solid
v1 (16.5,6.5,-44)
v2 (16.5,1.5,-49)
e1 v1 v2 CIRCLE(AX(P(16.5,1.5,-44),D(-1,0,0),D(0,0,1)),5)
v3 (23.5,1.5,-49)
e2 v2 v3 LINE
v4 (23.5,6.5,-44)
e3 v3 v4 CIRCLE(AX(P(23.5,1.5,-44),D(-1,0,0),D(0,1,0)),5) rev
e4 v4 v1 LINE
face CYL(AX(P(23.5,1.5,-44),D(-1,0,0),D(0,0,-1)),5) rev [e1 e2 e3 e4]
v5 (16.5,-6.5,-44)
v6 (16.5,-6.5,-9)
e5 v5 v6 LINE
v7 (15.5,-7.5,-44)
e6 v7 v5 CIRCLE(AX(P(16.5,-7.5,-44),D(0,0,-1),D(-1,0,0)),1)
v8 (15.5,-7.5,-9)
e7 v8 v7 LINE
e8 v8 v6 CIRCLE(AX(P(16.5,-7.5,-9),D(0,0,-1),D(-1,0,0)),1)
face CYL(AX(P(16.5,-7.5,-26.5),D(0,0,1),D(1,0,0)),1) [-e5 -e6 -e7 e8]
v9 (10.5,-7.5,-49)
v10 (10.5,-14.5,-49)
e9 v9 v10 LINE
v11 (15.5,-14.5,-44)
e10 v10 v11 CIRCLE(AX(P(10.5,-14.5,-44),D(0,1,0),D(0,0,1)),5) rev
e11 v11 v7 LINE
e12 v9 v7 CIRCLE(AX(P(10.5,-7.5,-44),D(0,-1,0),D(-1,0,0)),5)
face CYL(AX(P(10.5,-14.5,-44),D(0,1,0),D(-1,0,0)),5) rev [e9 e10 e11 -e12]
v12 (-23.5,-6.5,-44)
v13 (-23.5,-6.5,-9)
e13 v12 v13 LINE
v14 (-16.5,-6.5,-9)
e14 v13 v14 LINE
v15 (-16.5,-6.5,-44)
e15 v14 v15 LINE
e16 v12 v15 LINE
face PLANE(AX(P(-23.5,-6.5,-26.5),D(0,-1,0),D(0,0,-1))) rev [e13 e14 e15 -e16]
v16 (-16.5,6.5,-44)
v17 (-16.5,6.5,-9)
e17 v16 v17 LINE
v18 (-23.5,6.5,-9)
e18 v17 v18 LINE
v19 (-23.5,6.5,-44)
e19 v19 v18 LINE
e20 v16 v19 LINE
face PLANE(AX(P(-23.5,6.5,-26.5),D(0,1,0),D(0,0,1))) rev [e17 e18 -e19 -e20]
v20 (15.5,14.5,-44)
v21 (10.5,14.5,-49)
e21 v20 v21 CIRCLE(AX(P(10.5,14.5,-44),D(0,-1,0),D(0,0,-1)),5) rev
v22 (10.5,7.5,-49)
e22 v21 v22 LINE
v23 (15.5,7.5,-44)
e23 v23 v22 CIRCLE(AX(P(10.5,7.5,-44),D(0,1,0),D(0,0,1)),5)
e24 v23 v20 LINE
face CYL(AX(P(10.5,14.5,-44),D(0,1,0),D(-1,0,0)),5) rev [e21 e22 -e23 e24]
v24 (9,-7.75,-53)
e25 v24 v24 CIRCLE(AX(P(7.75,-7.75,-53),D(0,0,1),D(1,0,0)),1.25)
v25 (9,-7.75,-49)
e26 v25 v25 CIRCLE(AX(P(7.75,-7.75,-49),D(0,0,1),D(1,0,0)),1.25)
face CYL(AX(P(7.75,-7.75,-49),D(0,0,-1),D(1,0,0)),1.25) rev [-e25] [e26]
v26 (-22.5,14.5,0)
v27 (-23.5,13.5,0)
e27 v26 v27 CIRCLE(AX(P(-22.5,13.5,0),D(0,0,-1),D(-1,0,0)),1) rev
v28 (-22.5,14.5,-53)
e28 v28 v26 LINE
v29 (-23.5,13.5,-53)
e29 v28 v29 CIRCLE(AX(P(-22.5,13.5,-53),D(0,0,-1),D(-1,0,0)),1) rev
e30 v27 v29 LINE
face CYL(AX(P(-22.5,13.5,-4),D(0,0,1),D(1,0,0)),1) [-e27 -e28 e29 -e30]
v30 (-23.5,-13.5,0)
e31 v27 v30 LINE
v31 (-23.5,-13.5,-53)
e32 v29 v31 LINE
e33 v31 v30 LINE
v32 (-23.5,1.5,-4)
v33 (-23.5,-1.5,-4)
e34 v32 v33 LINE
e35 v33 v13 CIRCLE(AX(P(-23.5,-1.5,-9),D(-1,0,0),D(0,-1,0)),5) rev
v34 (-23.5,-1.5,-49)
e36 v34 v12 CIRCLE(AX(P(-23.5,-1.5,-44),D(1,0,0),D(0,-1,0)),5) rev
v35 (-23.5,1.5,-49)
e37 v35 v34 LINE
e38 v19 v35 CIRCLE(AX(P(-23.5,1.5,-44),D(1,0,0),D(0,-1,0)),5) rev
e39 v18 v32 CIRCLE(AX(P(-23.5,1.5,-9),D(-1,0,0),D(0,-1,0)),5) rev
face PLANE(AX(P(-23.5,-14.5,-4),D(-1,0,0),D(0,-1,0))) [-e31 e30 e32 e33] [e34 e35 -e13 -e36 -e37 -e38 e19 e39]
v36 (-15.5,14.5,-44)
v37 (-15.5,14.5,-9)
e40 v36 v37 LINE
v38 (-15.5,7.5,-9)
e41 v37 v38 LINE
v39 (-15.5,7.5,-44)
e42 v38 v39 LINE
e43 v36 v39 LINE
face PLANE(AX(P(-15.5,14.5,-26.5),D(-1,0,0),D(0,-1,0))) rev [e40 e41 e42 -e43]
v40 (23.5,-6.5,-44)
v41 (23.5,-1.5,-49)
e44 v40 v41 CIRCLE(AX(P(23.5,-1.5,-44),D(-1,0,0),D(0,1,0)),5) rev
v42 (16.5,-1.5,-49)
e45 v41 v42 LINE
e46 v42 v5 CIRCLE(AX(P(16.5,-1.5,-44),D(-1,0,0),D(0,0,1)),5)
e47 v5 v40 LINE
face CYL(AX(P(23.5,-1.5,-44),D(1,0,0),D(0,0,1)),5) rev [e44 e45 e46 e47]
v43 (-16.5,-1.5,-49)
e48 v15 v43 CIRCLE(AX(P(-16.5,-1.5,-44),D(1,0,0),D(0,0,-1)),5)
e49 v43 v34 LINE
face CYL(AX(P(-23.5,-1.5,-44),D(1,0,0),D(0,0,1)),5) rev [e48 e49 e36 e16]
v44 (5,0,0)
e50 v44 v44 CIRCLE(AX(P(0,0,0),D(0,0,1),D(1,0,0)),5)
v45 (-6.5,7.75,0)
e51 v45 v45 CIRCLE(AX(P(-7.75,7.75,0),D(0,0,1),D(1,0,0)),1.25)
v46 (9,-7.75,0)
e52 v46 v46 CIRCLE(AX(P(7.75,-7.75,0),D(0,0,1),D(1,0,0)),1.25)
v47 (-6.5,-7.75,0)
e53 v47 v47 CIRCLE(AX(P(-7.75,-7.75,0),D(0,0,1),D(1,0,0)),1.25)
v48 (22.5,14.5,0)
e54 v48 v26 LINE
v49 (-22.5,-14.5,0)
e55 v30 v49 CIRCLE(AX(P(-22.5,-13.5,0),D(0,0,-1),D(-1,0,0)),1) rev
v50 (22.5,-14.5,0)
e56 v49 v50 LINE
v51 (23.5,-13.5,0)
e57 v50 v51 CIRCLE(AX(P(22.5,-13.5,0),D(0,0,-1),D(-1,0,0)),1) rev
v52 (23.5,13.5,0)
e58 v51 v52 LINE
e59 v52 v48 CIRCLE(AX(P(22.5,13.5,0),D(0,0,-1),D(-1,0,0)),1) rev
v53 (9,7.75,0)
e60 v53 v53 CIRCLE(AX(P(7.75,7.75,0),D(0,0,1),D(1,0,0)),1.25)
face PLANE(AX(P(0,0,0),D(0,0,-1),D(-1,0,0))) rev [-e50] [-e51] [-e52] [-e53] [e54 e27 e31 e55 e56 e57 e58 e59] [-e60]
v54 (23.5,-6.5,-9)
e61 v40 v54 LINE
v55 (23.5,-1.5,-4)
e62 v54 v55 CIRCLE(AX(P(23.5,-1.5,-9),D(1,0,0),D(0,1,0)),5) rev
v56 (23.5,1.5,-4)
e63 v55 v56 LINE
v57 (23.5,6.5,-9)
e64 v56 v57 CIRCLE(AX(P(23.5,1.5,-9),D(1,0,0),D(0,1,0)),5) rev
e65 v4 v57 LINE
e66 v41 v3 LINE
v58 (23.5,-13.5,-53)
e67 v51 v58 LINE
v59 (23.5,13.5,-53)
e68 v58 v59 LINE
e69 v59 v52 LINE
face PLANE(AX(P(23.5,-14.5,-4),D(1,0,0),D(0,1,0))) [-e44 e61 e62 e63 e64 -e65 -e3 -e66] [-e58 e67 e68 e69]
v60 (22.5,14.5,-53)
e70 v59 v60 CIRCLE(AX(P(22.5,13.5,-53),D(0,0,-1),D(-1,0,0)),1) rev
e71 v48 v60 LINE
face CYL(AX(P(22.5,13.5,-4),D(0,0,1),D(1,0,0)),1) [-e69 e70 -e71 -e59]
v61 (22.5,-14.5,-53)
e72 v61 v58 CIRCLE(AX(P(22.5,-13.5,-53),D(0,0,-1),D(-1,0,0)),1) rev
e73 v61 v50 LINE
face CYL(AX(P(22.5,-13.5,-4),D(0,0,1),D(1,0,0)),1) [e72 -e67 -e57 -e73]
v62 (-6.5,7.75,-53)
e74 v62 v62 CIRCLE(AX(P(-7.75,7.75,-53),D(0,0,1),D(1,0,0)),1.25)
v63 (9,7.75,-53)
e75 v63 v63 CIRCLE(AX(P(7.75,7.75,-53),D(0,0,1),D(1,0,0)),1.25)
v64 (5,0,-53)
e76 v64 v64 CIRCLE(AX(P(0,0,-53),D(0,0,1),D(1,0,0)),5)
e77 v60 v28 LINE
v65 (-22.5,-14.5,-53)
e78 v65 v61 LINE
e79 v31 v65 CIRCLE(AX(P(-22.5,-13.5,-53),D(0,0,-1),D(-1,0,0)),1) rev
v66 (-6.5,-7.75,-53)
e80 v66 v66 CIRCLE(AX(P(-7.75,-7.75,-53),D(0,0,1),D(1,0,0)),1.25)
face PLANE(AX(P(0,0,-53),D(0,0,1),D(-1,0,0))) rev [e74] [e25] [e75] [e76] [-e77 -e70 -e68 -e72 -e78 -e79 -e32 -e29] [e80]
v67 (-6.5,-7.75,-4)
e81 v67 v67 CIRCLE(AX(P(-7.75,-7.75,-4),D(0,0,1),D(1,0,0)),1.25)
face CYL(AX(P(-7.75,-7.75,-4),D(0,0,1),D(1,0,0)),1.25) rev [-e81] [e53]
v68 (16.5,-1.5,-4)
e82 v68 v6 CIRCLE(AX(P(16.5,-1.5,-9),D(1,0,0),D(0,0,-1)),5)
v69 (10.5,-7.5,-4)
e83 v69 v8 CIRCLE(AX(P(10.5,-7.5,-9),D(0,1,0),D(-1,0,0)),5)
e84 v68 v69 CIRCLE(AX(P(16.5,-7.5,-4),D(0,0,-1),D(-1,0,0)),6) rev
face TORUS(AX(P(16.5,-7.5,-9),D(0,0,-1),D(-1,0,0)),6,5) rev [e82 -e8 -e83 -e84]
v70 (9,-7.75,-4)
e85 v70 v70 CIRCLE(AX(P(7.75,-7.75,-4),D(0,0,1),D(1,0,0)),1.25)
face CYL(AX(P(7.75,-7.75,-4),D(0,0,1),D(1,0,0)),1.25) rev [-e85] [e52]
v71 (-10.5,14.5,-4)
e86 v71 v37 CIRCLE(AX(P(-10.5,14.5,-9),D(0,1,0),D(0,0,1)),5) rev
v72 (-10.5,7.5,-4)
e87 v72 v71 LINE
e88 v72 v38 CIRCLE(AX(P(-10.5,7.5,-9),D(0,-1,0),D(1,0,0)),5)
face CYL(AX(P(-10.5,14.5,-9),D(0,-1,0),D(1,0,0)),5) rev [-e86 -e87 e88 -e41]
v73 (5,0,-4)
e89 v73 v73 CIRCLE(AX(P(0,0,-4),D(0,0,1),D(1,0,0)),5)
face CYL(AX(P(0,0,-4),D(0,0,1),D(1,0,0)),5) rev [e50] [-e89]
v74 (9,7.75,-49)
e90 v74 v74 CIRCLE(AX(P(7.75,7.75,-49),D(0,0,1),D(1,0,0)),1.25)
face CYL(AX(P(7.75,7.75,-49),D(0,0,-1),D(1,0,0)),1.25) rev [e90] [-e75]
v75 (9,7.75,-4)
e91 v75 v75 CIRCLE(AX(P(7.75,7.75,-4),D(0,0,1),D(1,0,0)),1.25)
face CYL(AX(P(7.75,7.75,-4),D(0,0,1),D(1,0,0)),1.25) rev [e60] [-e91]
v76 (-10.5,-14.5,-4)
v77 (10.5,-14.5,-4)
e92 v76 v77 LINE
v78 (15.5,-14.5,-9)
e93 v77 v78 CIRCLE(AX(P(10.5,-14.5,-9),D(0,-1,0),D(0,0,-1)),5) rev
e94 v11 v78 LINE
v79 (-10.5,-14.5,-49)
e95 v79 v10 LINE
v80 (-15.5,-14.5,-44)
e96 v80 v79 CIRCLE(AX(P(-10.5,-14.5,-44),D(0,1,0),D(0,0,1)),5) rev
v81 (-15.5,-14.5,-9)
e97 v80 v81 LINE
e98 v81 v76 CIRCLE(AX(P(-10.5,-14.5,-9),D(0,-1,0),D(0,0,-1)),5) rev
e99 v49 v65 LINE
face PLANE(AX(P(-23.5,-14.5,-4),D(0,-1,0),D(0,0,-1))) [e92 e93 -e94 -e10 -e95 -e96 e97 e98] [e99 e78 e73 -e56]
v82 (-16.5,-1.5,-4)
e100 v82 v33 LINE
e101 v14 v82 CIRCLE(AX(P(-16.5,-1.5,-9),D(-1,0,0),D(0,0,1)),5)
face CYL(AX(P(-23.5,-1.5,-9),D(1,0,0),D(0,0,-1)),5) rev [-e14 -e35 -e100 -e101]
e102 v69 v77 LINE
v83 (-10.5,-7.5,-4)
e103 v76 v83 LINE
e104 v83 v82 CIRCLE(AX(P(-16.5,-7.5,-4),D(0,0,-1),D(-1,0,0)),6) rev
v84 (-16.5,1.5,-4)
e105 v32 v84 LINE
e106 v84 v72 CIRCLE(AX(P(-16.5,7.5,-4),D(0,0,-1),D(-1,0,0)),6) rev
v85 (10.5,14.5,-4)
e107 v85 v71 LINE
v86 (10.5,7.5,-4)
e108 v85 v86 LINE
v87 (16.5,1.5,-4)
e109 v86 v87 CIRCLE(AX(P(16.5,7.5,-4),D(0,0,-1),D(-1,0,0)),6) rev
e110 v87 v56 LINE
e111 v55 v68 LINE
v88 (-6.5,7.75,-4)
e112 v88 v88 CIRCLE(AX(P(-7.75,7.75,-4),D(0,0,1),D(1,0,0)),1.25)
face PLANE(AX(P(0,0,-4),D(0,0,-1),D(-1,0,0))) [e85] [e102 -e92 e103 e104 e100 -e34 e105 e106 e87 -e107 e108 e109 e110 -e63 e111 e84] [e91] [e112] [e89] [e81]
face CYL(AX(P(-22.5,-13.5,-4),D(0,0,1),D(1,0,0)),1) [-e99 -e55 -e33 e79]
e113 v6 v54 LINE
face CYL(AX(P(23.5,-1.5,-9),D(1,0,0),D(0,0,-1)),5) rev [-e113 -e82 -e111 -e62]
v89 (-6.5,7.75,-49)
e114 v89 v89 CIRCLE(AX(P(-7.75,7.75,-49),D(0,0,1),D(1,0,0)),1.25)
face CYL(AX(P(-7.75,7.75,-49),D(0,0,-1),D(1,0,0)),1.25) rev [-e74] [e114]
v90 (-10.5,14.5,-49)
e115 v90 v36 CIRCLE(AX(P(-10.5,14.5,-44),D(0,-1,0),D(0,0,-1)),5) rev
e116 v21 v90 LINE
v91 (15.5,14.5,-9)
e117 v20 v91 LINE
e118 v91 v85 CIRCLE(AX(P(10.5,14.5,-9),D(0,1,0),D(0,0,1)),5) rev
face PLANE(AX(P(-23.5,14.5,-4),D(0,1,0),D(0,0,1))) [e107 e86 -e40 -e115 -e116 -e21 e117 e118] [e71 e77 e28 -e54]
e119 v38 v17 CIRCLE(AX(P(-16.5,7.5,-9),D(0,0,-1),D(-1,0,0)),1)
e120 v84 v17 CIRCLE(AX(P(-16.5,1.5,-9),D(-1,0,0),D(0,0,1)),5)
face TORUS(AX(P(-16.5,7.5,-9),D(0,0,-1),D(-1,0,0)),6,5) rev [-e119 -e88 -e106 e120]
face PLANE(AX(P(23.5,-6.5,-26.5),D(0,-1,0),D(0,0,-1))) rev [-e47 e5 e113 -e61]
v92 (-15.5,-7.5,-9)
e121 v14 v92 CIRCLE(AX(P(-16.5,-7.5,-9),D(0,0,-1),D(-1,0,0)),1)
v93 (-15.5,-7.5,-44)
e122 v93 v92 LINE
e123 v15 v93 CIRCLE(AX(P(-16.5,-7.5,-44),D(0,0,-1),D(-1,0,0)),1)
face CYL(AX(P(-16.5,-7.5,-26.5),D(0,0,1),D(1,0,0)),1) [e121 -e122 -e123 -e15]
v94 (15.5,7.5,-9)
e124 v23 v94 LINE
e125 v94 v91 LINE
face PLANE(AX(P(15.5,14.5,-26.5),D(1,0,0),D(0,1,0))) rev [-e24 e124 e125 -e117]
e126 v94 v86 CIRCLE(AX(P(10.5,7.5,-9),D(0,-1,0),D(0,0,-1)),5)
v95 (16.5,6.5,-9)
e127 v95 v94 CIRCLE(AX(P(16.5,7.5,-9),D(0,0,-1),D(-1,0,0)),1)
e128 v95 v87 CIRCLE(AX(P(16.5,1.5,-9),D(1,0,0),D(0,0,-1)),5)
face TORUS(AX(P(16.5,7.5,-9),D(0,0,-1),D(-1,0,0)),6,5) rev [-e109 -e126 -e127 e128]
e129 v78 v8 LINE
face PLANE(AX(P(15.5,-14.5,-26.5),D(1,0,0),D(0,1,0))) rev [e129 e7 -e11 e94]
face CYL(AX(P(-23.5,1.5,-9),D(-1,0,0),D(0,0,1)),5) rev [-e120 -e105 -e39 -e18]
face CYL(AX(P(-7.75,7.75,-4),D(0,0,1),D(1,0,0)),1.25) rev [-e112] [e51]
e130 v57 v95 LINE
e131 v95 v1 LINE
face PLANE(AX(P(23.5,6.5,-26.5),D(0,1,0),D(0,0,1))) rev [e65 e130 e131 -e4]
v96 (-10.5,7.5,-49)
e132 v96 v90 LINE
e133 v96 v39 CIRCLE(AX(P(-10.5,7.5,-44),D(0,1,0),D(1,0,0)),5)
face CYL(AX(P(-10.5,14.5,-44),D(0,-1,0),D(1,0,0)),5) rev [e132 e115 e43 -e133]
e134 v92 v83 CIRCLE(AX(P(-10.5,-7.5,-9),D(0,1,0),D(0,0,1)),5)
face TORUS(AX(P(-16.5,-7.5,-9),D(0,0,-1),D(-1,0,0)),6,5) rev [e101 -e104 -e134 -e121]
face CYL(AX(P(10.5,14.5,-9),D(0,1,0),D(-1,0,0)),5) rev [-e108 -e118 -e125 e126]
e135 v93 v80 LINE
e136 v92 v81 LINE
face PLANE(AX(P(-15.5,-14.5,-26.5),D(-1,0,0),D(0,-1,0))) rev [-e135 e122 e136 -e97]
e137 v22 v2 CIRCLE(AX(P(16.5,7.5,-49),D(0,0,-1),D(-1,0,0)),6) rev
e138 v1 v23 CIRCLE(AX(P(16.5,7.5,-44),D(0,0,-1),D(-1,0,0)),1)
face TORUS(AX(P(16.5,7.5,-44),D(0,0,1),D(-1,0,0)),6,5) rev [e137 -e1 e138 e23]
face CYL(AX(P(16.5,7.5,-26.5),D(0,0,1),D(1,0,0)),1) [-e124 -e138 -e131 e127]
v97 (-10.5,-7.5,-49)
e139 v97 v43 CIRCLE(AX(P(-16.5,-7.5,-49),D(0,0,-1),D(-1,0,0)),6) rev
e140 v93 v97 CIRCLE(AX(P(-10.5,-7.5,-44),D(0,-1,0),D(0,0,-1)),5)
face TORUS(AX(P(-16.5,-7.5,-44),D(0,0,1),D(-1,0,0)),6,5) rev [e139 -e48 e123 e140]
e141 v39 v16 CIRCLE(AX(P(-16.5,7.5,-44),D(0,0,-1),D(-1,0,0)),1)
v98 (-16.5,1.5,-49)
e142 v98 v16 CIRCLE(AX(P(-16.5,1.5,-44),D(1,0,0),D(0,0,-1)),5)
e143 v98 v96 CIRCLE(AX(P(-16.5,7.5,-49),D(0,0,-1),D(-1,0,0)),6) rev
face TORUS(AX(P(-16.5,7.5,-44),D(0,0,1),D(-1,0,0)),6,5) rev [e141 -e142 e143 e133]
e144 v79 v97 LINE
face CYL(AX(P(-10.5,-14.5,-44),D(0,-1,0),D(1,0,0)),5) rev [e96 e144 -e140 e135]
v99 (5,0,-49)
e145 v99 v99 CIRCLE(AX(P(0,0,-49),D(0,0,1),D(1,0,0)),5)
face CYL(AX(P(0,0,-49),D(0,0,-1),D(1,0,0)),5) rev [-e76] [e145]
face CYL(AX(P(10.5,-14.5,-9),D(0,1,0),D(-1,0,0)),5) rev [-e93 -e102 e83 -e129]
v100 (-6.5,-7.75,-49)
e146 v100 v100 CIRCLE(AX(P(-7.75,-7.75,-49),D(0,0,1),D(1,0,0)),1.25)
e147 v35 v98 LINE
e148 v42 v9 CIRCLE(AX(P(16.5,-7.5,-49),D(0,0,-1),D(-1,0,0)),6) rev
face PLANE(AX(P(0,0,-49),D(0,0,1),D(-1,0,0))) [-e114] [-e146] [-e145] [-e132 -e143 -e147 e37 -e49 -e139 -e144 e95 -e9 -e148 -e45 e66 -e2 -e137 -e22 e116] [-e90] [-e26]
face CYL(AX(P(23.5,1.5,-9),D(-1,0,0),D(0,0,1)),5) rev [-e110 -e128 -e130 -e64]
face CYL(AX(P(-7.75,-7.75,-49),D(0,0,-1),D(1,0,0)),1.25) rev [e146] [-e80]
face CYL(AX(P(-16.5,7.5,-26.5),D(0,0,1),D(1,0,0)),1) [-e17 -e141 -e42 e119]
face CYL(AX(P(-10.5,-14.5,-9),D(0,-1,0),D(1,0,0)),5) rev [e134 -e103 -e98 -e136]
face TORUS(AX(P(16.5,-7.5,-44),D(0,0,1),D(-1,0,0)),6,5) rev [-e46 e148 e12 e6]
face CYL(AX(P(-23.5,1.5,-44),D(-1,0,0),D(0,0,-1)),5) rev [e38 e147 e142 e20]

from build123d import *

# Parameters (mm, degrees)
SKETCH1_W            = 47
SKETCH1_H            = 29
SKETCH1_R            = 1.25
SKETCH1_R_2          = 5
BOSS_EXTRUDE1_DEPTH  = 4
SKETCH3_W            = 8
SKETCH3_H            = 8
BOSS_EXTRUDE2_DEPTH  = 22.5
FILLET1_R            = 1
FILLET2_R            = 5
FILLET1_OF_MIRROR3_R = 1
FILLET2_OF_MIRROR3_R = 5


with BuildPart() as part:
    # Sketch1 → Boss-Extrude1 (new body)
    with BuildSketch(Plane.XY):
        Rectangle(SKETCH1_W, SKETCH1_H)
        with Locations((7.75, -7.75)):
            Circle(SKETCH1_R, mode=Mode.SUBTRACT)
        with Locations((7.75, 7.75)):
            Circle(SKETCH1_R, mode=Mode.SUBTRACT)
        with Locations((-7.75, 7.75)):
            Circle(SKETCH1_R, mode=Mode.SUBTRACT)
        Circle(SKETCH1_R_2, mode=Mode.SUBTRACT)
        with Locations((-7.75, -7.75)):
            Circle(SKETCH1_R, mode=Mode.SUBTRACT)
    boss_extrude1 = extrude(amount=-BOSS_EXTRUDE1_DEPTH)

    # Sketch3 → Boss-Extrude2 (add)
    with BuildSketch(Plane(origin=(0, 0, -4), x_dir=(-1, 0, 0), z_dir=(0, 0, -1))):
        with Locations((19.5, -10.5)):
            Rectangle(SKETCH3_W, SKETCH3_H)
        with Locations((-19.5, -10.5)):
            Rectangle(SKETCH3_W, SKETCH3_H)
        with Locations((-19.5, 10.5)):
            Rectangle(SKETCH3_W, SKETCH3_H)
        with Locations((19.5, 10.5)):
            Rectangle(SKETCH3_W, SKETCH3_H)
    boss_extrude2 = extrude(amount=BOSS_EXTRUDE2_DEPTH)

    # Fillet1
    fillet1_edges = [part.edges().sort_by_distance(p)[0] for p in [
        (15.5, 6.5, -15.25),
        (-15.5, 6.5, -15.25),
        (-15.5, -6.5, -15.25),
        (15.5, -6.5, -15.25),
        (23.5, -14.5, -13.25),
        (23.5, 14.5, -13.25),
        (-23.5, 14.5, -13.25),
        (-23.5, -14.5, -13.25),
    ]]
    fillet(fillet1_edges, radius=FILLET1_R)

    # Fillet2
    fillet2_edges = [part.edges().sort_by_distance(p)[0] for p in [
        (15.5, -11, -4),
        (15.792893219, -6.792893219, -4),
        (-15.5, -11, -4),
        (-15.792893219, -6.792893219, -4),
        (-15.5, 11, -4),
        (-15.792893219, 6.792893219, -4),
        (15.5, 11, -4),
        (15.792893219, 6.792893219, -4),
        (20, -6.5, -4),
        (-20, -6.5, -4),
        (-20, 6.5, -4),
        (20, 6.5, -4),
    ]]
    fillet(fillet2_edges, radius=FILLET2_R)

    # Mirror3: Boss-Extrude1, Boss-Extrude2 across plane
    add(boss_extrude1.mirror(Plane.XY.offset(-26.5)))
    add(boss_extrude2.mirror(Plane.XY.offset(-26.5)))

    # Fillet1 of Mirror3
    fillet1_of_mirror3_edges = [part.edges().sort_by_distance(p)[0] for p in [
        (15.5, 6.5, -37.75),
        (-15.5, 6.5, -37.75),
        (-15.5, -6.5, -37.75),
        (15.5, -6.5, -37.75),
        (23.5, -14.5, -39.75),
        (23.5, 14.5, -39.75),
        (-23.5, 14.5, -39.75),
        (-23.5, -14.5, -39.75),
    ]]
    fillet(fillet1_of_mirror3_edges, radius=FILLET1_OF_MIRROR3_R)

    # Fillet2 of Mirror3
    fillet2_of_mirror3_edges = [part.edges().sort_by_distance(p)[0] for p in [
        (15.5, -11, -49),
        (15.792893219, -6.792893219, -49),
        (-15.5, -11, -49),
        (-15.792893219, -6.792893219, -49),
        (-15.5, 11, -49),
        (-15.792893219, 6.792893219, -49),
        (15.5, 11, -49),
        (15.792893219, 6.792893219, -49),
        (20, -6.5, -49),
        (-20, -6.5, -49),
        (-20, 6.5, -49),
        (20, 6.5, -49),
    ]]
    fillet(fillet2_of_mirror3_edges, radius=FILLET2_OF_MIRROR3_R)


solid = part.part
